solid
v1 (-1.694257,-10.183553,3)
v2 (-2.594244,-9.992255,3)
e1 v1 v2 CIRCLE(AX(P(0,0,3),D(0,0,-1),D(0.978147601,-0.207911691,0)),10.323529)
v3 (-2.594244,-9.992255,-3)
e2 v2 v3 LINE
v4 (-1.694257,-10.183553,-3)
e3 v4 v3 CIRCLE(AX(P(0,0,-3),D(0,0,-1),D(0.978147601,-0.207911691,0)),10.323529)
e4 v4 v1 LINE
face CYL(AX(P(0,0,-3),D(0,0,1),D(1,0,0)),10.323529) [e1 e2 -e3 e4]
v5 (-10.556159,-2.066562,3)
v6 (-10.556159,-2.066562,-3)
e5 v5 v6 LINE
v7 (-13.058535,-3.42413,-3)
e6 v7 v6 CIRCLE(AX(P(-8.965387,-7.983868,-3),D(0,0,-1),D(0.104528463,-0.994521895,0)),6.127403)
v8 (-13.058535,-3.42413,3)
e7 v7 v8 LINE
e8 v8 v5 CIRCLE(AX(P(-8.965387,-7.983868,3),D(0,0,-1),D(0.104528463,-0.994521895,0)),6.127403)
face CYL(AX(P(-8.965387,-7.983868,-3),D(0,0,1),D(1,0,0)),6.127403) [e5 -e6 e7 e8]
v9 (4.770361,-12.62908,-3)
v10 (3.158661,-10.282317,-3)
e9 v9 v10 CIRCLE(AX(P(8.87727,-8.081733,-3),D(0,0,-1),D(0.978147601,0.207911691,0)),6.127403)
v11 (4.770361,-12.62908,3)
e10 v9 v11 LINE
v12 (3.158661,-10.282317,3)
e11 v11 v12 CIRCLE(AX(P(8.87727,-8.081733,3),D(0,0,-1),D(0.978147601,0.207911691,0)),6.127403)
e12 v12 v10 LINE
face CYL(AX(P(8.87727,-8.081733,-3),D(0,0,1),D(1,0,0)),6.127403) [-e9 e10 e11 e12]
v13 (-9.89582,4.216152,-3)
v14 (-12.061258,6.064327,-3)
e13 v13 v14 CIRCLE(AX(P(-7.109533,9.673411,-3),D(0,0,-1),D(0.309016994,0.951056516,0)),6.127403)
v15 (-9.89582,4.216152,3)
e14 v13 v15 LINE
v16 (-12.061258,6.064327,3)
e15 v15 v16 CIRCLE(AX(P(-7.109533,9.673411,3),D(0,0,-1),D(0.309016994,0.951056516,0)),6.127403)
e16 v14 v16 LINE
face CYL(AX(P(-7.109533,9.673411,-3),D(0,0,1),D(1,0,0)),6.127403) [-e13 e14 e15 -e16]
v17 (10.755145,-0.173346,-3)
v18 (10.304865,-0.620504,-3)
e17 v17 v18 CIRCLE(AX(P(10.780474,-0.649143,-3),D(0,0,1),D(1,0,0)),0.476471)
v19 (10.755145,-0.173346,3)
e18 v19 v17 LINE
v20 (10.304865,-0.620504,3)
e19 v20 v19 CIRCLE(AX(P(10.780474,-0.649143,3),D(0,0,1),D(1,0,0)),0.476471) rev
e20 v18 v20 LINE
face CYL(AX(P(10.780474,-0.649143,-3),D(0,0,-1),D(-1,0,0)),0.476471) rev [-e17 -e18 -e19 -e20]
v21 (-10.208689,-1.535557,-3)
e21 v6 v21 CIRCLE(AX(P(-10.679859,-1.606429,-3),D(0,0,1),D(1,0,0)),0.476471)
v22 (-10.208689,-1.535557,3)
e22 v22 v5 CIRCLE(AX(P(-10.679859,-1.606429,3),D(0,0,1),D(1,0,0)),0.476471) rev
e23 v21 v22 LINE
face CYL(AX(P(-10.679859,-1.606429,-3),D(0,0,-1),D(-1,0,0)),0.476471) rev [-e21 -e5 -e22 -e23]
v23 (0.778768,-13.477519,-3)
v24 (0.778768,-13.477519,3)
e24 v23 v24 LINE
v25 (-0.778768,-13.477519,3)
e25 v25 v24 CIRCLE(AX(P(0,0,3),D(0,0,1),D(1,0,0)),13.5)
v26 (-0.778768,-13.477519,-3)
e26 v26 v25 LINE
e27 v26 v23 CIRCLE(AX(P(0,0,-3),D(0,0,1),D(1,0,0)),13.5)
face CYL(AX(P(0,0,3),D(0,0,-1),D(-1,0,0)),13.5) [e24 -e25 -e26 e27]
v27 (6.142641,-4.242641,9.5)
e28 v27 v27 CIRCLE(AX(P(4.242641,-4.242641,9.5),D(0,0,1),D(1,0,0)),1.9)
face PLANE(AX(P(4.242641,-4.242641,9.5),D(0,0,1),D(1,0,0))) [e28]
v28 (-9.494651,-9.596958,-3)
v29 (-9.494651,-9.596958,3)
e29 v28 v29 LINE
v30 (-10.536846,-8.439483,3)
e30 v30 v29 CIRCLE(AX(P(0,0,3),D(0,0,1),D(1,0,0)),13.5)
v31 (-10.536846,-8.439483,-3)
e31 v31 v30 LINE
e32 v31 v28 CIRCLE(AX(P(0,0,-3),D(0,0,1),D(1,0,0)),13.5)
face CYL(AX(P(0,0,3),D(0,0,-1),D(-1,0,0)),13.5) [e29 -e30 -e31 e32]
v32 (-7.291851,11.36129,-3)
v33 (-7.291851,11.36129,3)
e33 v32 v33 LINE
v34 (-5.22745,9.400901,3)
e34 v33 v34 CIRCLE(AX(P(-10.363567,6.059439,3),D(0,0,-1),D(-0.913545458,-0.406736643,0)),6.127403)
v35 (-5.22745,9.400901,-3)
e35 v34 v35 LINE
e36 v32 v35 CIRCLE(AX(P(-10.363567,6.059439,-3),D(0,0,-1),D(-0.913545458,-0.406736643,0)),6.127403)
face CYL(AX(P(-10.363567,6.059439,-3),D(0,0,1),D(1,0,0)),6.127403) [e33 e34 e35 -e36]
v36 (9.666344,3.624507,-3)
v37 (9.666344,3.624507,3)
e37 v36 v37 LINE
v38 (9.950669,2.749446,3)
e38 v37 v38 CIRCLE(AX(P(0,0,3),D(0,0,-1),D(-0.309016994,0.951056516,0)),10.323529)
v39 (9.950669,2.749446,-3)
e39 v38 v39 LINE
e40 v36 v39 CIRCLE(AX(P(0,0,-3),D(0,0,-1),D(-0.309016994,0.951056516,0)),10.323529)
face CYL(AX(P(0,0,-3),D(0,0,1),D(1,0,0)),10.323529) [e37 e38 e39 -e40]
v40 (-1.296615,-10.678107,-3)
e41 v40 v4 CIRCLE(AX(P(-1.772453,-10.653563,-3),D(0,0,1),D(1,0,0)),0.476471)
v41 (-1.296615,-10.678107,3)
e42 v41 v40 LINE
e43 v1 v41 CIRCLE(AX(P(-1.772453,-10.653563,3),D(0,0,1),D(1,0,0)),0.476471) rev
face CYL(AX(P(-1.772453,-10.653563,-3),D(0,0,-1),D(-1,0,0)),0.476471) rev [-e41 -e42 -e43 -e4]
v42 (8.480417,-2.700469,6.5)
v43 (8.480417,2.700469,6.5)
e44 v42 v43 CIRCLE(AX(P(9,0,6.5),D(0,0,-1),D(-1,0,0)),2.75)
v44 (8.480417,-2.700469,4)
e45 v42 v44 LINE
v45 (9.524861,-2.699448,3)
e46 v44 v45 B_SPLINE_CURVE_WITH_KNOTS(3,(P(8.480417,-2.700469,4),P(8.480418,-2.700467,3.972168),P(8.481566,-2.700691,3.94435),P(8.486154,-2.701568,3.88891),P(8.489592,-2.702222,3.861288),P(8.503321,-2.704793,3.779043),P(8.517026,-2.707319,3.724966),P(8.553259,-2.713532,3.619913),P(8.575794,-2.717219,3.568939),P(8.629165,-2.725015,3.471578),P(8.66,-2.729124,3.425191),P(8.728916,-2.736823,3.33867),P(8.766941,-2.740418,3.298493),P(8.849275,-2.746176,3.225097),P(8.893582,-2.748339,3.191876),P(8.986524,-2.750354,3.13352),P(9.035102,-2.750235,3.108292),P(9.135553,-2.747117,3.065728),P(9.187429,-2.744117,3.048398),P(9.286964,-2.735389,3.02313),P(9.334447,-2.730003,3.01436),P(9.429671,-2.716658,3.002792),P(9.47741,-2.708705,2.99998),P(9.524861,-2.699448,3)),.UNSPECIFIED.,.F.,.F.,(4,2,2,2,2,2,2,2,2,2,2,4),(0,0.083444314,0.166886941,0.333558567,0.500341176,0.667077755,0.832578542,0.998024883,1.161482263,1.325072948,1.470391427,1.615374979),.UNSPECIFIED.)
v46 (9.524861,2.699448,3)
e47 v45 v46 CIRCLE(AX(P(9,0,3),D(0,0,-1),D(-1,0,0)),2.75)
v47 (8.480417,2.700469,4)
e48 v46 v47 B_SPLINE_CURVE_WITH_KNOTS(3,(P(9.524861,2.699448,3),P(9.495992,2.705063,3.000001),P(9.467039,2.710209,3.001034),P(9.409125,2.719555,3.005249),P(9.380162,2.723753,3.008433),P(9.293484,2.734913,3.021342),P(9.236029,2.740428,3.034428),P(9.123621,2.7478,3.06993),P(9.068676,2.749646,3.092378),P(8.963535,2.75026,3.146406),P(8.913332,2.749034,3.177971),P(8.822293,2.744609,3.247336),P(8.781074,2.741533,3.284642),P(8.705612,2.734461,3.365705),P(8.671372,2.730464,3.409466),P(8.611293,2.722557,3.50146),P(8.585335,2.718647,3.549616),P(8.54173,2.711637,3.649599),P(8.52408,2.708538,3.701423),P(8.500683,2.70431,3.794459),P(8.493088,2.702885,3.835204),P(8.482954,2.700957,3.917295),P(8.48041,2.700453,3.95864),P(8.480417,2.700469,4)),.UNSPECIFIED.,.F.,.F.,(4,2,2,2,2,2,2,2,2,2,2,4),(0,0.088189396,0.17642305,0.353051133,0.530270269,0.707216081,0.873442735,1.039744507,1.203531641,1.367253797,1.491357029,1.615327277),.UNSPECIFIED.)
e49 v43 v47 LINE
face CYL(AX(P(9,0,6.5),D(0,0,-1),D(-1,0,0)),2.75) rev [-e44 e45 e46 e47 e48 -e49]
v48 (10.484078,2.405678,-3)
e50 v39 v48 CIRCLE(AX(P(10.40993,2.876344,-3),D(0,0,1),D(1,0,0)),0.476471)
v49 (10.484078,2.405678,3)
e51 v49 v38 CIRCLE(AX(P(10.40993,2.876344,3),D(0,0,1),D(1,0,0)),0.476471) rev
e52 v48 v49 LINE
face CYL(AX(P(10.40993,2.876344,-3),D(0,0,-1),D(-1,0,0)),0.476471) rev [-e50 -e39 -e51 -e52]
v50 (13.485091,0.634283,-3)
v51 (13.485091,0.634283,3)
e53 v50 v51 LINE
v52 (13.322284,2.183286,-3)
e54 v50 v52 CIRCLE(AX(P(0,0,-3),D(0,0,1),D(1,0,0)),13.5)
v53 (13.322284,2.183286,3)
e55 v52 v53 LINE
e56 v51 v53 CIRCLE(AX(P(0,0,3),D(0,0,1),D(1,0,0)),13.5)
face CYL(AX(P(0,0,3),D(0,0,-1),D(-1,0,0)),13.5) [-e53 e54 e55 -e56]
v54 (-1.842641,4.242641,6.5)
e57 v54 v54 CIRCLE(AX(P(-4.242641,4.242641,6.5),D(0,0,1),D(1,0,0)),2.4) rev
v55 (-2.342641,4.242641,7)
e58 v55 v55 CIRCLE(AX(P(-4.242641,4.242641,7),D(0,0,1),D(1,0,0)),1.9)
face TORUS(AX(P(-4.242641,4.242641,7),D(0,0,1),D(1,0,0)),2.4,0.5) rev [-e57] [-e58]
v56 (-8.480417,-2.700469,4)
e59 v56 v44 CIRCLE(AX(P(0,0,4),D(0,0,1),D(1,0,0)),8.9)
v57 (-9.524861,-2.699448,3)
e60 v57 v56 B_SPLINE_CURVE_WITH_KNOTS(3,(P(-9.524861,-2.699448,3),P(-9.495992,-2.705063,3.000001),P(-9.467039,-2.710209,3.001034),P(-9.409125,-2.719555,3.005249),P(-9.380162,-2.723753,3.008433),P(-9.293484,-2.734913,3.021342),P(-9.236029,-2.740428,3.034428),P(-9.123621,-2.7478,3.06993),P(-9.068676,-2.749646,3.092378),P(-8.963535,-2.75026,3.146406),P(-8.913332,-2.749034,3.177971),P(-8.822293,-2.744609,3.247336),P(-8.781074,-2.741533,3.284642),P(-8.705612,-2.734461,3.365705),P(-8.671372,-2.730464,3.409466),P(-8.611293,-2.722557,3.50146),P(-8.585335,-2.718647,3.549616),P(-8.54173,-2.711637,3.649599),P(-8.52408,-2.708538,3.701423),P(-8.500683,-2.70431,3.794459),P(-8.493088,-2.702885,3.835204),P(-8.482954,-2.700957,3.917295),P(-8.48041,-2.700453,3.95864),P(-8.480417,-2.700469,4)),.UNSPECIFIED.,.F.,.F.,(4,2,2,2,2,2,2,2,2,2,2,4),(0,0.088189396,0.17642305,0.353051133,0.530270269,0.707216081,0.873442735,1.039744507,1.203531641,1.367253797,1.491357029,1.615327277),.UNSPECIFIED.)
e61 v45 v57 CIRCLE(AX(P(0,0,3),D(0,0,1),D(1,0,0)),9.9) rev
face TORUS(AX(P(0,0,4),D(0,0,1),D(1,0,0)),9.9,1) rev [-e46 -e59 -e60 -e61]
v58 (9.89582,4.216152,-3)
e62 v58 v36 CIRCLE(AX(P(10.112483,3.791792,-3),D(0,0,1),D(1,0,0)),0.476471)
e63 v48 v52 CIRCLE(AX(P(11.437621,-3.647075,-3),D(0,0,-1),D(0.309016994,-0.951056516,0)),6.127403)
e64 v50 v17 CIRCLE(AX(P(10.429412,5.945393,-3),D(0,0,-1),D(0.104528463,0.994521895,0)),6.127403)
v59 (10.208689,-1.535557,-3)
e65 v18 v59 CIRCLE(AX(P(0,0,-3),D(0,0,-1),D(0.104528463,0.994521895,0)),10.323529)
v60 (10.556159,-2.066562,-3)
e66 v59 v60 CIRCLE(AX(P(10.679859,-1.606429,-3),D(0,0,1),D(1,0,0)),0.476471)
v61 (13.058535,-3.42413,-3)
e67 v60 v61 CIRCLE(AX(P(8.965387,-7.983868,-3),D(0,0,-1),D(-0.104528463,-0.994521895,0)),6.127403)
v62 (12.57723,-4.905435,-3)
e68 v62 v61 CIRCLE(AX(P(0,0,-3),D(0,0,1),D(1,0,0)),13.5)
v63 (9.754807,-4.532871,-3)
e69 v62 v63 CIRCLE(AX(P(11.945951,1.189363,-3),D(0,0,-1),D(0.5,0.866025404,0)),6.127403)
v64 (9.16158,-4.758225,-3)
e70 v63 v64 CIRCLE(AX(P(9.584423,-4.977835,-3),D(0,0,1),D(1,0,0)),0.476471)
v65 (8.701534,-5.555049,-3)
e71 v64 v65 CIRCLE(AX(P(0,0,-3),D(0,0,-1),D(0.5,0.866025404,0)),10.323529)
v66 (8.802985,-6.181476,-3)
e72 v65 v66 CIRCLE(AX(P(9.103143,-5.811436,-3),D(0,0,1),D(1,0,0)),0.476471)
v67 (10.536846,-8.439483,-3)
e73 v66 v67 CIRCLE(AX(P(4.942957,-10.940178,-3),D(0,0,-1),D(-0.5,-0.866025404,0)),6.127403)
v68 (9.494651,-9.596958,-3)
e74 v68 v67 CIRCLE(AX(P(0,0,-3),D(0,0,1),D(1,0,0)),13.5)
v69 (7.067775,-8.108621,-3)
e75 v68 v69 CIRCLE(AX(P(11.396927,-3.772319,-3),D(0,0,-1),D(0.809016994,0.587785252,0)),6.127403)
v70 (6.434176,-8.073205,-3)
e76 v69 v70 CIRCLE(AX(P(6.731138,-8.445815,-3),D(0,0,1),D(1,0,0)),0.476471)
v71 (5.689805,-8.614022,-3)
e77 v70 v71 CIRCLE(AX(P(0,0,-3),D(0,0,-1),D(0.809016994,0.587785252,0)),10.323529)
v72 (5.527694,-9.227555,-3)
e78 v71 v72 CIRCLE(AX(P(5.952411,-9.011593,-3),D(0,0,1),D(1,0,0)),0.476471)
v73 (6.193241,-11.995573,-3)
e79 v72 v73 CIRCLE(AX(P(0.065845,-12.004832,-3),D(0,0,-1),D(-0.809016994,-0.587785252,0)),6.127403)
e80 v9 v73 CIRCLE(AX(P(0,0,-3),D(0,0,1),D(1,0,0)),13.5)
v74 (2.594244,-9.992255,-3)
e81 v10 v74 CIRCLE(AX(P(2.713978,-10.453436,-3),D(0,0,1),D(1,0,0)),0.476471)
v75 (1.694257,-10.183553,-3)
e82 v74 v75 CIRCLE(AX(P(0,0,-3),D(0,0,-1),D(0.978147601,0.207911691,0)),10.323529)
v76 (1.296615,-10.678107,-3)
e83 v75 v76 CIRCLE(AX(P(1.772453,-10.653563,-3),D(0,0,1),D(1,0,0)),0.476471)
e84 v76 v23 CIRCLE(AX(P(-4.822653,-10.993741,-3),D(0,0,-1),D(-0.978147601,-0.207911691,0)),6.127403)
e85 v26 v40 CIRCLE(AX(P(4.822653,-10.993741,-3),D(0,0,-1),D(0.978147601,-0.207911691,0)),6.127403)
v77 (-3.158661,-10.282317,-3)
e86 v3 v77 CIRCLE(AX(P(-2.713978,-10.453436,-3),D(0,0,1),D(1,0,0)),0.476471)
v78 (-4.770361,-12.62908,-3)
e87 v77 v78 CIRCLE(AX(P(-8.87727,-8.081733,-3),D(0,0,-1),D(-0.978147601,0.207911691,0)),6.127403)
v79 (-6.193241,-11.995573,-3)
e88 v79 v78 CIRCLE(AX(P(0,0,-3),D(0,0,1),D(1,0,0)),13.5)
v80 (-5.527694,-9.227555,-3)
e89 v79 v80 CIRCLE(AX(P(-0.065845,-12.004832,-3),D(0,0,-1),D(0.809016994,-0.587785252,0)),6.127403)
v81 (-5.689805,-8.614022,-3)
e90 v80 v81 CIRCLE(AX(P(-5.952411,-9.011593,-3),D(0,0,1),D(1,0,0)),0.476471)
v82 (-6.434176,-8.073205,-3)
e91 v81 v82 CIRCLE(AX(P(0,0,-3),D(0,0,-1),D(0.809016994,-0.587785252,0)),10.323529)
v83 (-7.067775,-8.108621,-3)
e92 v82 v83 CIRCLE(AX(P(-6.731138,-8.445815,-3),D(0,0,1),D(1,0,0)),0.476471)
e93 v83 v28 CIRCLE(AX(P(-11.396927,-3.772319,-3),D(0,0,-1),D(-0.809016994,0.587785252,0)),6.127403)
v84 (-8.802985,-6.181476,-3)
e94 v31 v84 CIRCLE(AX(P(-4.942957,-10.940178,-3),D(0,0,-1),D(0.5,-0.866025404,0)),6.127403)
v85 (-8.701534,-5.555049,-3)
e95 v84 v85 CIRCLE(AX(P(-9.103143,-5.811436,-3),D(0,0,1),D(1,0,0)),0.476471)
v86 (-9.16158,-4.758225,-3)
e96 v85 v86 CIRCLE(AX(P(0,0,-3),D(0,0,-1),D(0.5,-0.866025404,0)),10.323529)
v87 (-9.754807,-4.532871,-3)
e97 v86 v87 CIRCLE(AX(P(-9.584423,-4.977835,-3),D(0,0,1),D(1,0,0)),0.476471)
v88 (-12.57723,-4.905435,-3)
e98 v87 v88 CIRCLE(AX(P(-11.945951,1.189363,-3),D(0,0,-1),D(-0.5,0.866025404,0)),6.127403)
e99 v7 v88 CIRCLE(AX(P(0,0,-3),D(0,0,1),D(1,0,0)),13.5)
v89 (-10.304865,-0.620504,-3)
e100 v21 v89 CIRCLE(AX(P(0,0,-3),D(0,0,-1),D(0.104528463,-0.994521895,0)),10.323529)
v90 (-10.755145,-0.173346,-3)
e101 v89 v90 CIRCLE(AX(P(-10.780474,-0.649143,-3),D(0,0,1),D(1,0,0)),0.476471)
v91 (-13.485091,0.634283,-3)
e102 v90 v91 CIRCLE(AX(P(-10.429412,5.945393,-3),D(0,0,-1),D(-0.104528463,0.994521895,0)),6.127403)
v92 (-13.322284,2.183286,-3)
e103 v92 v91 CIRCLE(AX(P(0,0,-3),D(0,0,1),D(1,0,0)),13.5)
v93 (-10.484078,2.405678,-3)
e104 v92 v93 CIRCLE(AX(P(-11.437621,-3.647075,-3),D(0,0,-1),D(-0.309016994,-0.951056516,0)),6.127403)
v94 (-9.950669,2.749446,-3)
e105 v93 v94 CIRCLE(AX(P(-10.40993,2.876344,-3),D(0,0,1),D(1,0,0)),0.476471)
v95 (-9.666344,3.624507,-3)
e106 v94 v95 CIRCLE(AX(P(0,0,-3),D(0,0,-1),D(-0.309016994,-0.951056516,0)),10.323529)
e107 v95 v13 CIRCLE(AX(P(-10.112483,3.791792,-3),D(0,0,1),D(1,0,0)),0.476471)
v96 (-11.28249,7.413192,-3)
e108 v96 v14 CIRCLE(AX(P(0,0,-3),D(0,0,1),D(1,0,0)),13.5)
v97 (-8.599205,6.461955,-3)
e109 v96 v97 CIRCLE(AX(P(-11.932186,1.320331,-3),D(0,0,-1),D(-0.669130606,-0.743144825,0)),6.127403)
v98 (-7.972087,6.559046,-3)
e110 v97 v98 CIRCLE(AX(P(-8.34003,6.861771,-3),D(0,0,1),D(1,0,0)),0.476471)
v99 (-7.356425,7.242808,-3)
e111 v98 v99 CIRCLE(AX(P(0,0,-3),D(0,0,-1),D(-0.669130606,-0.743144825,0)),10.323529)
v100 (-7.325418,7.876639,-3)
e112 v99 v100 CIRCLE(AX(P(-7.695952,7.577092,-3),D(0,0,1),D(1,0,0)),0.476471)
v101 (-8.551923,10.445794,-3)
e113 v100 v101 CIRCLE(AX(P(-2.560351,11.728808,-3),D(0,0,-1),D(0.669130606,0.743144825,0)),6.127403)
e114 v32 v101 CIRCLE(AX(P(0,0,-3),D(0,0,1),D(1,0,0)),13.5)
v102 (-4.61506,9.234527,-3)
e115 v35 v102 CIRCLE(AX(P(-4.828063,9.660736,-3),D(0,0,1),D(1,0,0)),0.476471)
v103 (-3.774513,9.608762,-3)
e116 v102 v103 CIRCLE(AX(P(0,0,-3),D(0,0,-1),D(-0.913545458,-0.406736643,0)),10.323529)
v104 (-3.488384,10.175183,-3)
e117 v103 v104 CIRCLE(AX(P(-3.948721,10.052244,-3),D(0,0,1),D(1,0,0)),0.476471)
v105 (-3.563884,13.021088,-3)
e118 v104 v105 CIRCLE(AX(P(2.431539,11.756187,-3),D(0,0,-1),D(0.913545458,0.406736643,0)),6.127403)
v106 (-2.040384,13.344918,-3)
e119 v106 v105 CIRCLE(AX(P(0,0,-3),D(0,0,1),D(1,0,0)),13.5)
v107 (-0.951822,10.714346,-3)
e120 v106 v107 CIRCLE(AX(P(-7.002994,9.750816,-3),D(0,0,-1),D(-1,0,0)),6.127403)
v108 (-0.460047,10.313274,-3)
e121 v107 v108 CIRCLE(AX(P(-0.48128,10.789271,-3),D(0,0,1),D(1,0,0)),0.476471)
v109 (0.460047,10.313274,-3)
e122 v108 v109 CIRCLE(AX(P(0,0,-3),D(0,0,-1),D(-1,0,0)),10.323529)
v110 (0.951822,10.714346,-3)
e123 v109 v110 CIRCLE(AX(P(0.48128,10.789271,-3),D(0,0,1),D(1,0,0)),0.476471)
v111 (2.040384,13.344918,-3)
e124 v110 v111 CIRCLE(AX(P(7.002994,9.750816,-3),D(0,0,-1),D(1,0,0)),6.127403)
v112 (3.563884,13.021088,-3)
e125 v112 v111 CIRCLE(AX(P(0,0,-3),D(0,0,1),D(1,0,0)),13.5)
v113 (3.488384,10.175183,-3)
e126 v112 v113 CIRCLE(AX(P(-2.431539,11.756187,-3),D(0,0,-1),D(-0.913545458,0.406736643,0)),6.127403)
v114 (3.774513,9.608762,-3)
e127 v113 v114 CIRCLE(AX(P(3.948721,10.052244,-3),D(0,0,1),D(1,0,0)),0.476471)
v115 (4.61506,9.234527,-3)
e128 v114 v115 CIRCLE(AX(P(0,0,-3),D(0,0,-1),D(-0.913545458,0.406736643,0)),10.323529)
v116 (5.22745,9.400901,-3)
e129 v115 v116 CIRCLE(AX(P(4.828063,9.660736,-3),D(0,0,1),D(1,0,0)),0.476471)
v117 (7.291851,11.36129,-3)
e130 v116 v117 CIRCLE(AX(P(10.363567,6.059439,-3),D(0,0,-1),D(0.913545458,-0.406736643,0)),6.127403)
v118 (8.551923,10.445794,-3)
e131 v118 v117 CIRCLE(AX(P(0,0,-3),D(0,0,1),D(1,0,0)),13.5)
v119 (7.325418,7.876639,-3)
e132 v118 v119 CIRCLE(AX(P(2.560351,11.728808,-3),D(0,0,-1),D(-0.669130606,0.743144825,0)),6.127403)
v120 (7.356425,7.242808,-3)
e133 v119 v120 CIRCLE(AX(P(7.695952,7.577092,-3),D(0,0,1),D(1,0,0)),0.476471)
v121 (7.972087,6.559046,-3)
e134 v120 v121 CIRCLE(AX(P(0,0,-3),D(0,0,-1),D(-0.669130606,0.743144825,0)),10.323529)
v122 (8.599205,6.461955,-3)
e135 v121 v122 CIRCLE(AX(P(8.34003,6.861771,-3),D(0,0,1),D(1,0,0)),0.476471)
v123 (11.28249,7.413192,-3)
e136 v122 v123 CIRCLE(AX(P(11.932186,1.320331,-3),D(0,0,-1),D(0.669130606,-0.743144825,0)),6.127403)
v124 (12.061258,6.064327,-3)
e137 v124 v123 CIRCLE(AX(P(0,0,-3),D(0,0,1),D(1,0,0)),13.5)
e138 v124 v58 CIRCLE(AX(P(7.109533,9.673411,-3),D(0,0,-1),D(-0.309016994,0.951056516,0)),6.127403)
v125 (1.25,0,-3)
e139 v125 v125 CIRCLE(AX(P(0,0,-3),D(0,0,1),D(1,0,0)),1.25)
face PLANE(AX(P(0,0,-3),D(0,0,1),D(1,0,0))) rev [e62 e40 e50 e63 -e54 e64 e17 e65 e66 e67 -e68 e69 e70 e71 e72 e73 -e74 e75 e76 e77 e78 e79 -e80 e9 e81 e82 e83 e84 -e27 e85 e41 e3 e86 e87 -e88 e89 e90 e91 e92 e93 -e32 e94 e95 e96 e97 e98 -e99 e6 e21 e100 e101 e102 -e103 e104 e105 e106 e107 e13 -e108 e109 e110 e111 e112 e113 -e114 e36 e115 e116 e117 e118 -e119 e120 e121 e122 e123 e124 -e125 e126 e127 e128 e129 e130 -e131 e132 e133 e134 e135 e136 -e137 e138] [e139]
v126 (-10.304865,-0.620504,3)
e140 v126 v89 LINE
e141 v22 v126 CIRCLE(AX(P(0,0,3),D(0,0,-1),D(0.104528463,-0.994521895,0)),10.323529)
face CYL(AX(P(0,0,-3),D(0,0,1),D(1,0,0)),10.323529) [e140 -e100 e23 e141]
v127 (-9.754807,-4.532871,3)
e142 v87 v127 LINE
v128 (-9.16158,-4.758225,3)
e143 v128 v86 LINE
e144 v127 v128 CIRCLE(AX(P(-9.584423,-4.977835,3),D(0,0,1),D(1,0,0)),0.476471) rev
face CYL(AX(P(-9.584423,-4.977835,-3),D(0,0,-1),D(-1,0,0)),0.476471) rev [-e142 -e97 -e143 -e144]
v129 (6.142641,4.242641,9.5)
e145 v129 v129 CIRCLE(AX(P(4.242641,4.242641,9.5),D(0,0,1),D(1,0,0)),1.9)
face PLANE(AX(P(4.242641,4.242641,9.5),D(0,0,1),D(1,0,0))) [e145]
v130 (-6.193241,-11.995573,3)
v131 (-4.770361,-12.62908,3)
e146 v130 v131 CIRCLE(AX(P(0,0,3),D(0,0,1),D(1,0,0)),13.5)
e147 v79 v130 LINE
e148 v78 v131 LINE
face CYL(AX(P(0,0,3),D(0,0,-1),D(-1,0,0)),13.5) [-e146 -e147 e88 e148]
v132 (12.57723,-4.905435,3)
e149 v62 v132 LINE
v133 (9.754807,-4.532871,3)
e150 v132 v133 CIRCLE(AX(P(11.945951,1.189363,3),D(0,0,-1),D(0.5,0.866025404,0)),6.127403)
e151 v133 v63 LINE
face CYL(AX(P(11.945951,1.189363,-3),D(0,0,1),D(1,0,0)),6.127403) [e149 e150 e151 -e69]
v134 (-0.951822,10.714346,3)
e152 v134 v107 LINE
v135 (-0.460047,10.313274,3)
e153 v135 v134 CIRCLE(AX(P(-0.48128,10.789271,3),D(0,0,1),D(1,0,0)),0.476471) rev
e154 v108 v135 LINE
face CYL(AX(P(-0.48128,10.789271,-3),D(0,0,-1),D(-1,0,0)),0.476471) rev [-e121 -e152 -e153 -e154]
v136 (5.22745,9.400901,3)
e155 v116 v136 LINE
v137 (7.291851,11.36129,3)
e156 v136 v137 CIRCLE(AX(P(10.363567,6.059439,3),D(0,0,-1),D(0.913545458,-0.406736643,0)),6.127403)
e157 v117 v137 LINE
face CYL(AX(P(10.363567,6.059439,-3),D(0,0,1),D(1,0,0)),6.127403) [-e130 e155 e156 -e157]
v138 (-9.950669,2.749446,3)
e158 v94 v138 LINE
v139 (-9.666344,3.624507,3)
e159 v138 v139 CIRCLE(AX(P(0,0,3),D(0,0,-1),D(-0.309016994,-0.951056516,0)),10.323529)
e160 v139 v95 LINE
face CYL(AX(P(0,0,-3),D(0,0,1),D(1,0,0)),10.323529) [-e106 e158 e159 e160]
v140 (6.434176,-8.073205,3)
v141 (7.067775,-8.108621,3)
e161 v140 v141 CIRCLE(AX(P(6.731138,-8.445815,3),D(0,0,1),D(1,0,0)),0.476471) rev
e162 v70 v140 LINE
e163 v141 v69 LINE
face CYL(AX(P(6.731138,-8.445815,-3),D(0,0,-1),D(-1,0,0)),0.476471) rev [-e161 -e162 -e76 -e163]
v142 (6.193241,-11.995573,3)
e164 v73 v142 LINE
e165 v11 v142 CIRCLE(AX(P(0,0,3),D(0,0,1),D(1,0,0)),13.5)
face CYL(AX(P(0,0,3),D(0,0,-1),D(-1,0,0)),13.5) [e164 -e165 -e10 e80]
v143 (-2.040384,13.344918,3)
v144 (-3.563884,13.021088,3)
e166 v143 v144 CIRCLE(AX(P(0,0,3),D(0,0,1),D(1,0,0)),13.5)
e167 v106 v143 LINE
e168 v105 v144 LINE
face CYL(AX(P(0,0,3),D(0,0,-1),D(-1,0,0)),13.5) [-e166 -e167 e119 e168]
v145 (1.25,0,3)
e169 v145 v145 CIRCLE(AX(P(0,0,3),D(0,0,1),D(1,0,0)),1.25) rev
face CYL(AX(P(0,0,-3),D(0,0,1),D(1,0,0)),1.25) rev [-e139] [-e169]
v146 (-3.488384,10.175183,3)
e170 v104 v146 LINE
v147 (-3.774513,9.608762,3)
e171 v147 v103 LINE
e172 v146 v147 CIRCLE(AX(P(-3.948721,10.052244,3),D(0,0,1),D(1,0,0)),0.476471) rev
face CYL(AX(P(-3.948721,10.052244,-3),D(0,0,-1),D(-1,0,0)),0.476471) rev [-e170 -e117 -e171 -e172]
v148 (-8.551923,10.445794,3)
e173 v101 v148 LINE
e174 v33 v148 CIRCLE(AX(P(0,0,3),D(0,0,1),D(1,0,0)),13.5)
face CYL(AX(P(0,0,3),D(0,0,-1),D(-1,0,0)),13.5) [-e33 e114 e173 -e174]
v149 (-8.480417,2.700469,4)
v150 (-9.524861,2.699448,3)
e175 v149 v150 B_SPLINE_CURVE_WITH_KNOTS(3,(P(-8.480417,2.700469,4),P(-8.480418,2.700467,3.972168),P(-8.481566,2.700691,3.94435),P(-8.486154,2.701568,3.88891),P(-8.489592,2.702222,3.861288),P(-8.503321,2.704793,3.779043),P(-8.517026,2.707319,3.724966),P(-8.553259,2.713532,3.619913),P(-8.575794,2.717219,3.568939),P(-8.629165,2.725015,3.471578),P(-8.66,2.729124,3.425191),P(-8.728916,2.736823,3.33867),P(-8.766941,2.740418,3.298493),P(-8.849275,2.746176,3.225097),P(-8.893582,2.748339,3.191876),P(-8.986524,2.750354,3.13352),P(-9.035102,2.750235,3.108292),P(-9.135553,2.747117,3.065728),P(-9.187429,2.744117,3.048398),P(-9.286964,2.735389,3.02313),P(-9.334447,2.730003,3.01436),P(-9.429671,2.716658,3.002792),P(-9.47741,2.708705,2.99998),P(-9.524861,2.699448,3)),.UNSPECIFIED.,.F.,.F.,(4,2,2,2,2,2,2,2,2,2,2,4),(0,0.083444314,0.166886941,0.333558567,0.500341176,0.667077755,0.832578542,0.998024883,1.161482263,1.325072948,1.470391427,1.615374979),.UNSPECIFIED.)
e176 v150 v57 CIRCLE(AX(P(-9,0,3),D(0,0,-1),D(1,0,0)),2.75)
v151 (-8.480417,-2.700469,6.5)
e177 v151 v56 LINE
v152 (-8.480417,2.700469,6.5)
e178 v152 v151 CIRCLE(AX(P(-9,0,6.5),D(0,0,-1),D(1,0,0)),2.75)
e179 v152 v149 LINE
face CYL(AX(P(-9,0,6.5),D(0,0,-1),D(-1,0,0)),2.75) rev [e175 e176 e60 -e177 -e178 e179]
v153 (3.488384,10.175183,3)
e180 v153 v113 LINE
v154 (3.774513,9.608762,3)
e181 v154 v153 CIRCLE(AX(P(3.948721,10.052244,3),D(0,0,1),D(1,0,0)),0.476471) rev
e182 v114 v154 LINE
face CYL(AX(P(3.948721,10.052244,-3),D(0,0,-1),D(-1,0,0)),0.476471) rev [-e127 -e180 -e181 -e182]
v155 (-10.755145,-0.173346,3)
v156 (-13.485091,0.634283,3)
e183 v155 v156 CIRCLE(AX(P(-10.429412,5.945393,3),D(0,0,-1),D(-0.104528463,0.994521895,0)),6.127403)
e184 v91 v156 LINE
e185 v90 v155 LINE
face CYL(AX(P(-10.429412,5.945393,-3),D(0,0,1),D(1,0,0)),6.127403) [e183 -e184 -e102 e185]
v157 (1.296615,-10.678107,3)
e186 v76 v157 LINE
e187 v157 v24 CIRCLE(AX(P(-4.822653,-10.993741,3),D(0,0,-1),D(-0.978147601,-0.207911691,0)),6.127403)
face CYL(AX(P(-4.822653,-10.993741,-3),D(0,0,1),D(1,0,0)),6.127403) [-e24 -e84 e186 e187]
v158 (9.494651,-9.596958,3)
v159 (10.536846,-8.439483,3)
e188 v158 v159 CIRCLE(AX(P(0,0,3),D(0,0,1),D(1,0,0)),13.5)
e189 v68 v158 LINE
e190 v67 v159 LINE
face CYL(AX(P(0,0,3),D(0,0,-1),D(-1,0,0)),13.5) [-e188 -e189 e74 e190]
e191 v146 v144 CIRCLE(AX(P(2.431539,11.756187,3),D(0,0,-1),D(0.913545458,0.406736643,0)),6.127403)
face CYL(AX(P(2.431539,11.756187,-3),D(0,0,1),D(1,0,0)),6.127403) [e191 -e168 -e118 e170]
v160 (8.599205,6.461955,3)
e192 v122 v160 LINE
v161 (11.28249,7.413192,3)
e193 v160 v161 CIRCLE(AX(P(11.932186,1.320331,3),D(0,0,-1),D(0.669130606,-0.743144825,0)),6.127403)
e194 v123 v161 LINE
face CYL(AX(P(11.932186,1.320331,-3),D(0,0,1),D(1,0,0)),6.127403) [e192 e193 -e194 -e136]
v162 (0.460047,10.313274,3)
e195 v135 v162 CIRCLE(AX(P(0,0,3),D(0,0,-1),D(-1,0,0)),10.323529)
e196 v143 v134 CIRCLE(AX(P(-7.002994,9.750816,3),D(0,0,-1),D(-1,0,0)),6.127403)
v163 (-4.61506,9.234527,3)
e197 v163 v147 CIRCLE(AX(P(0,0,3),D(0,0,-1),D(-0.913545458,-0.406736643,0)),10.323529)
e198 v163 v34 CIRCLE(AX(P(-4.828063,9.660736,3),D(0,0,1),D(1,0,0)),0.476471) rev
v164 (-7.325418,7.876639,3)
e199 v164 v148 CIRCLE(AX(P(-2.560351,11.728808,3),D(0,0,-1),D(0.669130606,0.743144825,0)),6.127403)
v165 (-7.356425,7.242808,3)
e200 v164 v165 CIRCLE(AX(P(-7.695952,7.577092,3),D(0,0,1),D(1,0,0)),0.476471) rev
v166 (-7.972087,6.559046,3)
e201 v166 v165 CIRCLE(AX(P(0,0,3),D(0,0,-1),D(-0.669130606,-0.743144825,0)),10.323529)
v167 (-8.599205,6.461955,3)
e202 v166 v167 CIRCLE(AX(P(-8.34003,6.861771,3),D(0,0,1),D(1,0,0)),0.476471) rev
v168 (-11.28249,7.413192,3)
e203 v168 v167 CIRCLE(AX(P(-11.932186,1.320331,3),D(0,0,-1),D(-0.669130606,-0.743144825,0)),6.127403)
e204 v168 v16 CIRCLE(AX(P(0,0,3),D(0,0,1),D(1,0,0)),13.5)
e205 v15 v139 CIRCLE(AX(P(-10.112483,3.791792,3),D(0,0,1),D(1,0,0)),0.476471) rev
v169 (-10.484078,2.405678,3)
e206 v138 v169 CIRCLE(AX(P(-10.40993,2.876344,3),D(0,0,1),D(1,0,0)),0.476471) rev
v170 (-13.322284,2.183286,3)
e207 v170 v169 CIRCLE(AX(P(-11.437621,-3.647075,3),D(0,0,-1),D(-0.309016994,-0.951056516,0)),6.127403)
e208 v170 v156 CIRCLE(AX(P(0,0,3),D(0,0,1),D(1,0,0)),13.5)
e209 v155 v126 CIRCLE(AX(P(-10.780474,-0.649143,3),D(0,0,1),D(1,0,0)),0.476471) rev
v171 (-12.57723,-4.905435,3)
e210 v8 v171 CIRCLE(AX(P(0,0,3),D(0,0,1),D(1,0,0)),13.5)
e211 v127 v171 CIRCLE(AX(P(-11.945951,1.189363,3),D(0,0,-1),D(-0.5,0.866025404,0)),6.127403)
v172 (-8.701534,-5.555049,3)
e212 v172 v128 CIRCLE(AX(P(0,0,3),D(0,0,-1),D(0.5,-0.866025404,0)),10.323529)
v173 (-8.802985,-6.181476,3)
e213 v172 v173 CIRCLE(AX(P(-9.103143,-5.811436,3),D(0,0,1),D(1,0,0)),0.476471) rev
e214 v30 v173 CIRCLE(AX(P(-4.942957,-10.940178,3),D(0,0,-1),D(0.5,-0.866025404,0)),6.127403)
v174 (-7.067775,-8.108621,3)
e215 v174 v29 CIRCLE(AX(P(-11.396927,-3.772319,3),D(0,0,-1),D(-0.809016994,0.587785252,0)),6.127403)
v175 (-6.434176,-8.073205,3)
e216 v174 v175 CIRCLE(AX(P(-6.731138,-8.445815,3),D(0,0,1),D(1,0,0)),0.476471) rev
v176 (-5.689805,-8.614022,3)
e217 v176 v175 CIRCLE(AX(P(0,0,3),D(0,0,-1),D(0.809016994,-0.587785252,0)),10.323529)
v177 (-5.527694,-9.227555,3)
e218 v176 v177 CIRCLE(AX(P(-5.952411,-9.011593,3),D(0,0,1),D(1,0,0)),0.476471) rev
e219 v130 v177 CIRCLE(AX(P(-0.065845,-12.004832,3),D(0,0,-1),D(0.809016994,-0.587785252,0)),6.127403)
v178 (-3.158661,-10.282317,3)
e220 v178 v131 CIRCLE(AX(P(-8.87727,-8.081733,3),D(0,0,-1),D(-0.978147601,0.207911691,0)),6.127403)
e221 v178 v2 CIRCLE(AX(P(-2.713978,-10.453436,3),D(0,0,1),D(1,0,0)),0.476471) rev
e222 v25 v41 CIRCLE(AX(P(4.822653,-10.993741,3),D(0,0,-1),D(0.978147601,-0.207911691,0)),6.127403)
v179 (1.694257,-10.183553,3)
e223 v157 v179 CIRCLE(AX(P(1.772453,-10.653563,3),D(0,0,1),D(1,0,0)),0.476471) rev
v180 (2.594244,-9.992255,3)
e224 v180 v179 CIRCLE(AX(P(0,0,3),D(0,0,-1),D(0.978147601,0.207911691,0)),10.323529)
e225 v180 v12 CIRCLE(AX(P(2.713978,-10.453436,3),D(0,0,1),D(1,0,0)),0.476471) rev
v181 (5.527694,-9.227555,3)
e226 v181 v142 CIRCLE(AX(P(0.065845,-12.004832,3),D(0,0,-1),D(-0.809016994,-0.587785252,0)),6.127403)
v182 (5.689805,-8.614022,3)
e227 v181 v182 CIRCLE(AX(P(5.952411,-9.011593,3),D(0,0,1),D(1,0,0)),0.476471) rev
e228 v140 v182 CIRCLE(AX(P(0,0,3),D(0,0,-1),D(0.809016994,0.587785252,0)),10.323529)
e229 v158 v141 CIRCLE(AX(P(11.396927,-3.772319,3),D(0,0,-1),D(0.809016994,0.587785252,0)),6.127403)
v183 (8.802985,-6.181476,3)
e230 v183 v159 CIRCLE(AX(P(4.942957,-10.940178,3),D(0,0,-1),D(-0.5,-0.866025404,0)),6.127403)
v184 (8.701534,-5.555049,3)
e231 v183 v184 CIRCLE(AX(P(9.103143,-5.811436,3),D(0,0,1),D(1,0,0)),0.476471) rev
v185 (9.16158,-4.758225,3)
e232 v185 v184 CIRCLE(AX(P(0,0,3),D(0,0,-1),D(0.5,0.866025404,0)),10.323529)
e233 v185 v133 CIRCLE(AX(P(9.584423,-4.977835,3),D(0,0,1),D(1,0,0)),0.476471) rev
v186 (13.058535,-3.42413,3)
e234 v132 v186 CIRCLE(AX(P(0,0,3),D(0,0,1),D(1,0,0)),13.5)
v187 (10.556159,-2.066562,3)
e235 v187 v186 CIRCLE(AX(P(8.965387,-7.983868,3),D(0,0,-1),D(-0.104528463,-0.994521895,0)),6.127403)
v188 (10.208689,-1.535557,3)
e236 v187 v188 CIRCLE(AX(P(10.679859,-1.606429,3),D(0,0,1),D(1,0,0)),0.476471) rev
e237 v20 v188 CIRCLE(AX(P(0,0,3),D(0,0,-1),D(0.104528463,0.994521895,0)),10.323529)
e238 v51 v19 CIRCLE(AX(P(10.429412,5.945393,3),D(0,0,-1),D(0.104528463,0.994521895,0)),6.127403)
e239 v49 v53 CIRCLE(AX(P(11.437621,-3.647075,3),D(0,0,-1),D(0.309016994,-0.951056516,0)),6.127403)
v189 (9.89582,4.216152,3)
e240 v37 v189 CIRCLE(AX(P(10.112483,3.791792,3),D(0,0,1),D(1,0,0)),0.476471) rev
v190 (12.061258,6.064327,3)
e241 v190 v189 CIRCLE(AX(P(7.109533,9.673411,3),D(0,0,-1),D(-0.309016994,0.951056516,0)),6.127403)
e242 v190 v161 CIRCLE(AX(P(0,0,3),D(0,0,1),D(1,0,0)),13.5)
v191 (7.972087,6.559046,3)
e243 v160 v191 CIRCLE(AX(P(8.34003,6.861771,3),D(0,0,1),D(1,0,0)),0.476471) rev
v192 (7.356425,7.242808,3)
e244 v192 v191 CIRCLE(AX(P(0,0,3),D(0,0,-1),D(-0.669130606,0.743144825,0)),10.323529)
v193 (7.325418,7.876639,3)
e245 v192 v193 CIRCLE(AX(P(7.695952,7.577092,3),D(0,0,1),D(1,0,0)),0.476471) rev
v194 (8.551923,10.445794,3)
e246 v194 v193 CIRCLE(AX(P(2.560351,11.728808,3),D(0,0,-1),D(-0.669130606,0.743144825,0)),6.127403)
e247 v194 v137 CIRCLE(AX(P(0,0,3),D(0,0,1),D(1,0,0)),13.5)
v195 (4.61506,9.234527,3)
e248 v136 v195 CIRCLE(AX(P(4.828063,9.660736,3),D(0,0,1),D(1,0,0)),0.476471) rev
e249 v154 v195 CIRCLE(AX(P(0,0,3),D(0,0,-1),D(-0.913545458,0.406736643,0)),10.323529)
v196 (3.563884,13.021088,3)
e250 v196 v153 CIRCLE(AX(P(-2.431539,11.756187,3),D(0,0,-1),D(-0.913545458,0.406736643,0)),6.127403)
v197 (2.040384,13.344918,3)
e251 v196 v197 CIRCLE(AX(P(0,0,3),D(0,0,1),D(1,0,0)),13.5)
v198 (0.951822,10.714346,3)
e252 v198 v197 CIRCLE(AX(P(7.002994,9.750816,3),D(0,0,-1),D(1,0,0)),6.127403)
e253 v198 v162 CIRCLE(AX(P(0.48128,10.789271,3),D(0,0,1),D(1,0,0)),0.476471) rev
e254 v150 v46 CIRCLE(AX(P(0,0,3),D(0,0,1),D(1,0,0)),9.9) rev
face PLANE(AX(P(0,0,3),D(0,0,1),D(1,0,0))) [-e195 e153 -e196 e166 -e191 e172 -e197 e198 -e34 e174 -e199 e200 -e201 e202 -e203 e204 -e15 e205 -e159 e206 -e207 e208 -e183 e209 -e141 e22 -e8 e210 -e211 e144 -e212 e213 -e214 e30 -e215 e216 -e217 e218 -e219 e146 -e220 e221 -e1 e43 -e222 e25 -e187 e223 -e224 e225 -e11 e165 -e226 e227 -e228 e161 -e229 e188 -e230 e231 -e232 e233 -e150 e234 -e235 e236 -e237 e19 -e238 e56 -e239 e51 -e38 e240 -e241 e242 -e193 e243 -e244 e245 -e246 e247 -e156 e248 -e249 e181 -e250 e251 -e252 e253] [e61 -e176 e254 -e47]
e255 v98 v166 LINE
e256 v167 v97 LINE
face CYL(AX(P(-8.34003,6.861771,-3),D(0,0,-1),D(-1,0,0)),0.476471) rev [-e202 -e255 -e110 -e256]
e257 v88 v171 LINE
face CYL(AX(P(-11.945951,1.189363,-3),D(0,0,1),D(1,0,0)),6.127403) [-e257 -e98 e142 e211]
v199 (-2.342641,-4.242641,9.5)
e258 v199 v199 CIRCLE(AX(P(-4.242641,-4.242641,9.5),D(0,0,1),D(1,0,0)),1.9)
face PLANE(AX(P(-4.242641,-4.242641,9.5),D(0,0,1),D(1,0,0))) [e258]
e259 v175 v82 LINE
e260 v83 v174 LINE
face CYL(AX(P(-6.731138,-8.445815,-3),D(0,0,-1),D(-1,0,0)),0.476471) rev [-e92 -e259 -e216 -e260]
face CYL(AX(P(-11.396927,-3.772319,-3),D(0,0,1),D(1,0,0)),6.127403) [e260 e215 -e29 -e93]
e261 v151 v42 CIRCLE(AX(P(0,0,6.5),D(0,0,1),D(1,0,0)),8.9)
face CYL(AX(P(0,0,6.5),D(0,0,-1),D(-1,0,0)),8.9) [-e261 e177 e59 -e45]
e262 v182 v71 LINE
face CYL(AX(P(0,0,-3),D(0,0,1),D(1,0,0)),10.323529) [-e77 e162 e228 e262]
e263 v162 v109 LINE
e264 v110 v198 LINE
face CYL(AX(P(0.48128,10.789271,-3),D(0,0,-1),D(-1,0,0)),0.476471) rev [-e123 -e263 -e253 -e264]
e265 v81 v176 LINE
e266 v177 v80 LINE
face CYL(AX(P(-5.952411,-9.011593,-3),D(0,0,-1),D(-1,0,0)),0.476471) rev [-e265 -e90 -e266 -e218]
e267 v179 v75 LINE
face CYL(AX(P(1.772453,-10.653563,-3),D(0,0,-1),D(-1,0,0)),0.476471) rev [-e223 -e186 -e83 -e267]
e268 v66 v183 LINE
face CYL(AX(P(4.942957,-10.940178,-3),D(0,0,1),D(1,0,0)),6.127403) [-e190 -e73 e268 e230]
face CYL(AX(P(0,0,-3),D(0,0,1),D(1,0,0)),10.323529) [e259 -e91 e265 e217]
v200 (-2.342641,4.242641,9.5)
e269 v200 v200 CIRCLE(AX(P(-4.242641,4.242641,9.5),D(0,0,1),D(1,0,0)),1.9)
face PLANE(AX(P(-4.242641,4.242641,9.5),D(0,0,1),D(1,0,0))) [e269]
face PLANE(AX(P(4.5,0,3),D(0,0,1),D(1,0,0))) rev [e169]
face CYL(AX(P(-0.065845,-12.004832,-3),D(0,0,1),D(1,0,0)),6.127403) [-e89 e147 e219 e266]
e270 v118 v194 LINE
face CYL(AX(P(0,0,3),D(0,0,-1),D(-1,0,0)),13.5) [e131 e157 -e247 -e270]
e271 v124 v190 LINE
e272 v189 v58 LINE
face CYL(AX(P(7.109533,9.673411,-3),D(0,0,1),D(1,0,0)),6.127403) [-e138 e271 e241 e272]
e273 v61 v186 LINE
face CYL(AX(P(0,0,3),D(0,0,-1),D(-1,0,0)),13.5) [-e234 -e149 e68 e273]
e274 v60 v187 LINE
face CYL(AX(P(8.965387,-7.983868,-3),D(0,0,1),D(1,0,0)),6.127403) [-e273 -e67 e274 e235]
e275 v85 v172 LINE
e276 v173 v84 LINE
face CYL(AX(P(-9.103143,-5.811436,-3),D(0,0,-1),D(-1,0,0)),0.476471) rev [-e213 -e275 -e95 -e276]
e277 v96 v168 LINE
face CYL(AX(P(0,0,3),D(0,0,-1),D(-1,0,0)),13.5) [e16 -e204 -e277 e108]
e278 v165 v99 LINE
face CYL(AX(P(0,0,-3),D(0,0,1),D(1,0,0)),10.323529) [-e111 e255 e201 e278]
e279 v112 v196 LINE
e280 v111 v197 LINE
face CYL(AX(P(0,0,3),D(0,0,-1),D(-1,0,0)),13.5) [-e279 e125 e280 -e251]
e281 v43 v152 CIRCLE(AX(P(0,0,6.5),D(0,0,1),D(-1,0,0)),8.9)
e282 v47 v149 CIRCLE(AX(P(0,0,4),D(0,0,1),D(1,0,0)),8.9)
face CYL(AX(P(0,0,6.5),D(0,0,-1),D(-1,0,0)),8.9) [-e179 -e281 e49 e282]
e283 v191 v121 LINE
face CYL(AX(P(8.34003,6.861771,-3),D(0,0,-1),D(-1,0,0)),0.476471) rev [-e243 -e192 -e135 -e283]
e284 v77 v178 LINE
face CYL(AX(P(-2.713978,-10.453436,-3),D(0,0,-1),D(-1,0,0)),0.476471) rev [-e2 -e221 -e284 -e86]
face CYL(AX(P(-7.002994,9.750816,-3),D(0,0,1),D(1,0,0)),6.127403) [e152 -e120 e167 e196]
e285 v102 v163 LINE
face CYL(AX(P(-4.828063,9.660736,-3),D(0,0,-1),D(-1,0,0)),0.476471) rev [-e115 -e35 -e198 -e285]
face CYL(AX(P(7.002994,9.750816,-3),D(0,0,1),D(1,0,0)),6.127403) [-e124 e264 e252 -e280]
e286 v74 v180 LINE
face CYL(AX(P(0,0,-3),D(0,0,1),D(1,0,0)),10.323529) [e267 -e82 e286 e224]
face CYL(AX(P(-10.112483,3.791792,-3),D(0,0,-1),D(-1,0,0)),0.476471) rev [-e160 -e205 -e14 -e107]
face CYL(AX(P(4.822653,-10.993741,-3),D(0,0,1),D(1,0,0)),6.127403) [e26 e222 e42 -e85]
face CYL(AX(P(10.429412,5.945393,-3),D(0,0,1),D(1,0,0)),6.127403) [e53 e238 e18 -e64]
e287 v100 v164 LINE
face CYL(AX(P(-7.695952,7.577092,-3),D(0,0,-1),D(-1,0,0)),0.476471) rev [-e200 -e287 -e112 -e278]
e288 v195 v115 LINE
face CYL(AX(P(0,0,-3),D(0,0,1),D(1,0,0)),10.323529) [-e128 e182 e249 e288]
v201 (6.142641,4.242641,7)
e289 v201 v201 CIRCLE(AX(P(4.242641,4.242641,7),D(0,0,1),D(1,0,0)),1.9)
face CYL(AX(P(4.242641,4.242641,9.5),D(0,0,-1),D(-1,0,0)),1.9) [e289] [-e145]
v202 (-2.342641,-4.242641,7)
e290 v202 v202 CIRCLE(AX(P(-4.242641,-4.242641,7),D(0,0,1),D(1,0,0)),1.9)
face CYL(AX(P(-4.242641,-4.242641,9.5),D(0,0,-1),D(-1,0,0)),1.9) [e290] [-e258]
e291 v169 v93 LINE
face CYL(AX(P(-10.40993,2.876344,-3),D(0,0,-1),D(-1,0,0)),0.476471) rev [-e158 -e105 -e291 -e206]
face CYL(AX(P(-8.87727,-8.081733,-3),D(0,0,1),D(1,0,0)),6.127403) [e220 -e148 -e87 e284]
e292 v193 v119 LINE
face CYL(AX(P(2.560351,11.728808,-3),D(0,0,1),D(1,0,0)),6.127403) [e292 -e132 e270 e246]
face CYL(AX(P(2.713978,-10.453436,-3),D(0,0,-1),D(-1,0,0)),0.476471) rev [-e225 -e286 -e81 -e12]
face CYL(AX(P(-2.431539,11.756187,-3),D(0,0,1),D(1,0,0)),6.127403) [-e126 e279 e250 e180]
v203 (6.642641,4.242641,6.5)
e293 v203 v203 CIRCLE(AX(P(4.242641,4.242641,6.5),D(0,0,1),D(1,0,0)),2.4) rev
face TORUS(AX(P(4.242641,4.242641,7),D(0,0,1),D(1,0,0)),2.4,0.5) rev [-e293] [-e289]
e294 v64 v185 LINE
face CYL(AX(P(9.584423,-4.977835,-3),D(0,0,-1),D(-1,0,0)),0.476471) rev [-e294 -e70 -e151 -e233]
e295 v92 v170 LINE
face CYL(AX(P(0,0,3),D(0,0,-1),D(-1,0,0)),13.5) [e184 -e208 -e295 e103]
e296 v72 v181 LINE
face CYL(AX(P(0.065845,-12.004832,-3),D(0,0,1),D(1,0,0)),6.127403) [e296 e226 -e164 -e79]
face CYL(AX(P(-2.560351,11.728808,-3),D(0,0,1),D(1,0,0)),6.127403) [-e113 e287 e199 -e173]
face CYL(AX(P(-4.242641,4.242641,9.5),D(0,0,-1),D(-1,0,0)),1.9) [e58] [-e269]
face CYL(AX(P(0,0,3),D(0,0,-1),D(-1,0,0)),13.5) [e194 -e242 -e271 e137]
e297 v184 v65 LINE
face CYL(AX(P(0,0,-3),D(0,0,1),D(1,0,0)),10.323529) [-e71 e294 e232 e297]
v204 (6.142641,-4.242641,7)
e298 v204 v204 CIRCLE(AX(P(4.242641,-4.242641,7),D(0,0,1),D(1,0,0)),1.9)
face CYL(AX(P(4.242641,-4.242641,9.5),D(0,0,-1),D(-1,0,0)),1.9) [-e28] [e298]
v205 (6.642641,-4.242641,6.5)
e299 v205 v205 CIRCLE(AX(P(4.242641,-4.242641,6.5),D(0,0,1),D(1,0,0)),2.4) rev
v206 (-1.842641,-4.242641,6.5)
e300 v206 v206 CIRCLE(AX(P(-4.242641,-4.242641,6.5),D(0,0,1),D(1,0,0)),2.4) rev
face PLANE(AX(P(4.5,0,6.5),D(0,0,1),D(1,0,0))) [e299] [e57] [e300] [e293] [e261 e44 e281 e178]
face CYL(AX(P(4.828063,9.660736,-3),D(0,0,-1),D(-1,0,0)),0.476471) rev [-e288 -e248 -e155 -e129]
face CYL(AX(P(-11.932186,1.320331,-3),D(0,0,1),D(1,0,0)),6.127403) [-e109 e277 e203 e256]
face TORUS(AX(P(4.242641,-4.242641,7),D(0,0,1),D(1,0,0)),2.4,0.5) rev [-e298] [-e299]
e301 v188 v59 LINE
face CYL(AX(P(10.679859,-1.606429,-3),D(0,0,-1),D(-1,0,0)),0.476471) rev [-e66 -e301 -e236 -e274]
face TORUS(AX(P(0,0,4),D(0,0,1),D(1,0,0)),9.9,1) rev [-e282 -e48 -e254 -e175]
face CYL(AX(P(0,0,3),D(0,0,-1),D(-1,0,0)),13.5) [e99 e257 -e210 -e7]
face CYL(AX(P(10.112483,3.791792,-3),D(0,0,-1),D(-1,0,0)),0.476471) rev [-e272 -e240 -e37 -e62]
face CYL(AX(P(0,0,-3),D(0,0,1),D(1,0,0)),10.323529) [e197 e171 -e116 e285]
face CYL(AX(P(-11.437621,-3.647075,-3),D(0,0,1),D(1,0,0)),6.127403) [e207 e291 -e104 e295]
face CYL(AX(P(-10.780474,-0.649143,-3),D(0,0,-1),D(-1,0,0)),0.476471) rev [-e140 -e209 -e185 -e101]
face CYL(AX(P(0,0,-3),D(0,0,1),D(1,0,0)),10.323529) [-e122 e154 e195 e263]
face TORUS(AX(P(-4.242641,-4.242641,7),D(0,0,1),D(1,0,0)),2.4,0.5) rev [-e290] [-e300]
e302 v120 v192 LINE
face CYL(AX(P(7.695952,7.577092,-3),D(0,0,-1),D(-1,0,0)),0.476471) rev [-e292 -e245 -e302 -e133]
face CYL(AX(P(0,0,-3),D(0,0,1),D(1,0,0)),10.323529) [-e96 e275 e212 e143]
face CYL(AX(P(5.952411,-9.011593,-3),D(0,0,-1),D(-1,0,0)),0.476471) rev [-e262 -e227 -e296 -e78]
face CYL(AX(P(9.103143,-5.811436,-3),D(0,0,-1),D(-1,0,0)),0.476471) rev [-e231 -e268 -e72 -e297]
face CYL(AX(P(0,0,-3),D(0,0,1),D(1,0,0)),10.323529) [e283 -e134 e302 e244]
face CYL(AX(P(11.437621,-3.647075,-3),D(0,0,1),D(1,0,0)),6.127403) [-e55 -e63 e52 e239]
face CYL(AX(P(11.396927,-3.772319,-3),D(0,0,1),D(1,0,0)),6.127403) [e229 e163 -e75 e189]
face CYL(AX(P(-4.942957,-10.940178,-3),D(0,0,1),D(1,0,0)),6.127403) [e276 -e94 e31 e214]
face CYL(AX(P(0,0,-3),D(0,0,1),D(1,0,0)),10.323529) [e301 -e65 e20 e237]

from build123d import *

# Parameters (mm, degrees)
SKETCH1_R                      = 13.5
BOSS_EXTRUDE1_DEPTH            = 3
CUT_EXTRUDE1_DEPTH             = 20.32614809
FILLET2_R                      = 0.476470588
CIRPATTERN1_COUNT              = 15
FILLET2_OF_CIRPATTERN1_R       = 0.476470588
THROUGH_CENTER_HOLE_DEPTH      = 20.315736881
THROUGH_CENTER_HOLE_DEPTH_BACK = 20.315736881
SKETCH5_R                      = 1.25
BOSS_EXTRUDE2_DEPTH            = 3.5
SKETCH7_R                      = 1.9
BOSS_EXTRUDE3_DEPTH            = 3
FILLET3_R                      = 1
FILLET4_R                      = 0.5


with BuildPart() as part:
    # Sketch1 → Boss-Extrude1 (new, symmetric)
    with BuildSketch(Plane.XY):
        Circle(SKETCH1_R)
    extrude(amount=BOSS_EXTRUDE1_DEPTH, both=True)

    # Sketch3 → Cut-Extrude1 (cut, symmetric)
    with BuildSketch(Plane.XY):
        with BuildLine():
            ThreePointArc((-2.040384037, 13.344917871), (-1.26191316, 11.892090906), (-0.898861073, 10.284323424))
            ThreePointArc((-0.898861073, 10.284323424), (0, 10.323529412), (0.898861073, 10.284323424))
            ThreePointArc((0.898861073, 10.284323424), (1.26191316, 11.892090906), (2.040384037, 13.344917871))
            ThreePointArc((2.040384037, 13.344917871), (0, 13.5), (-2.040384037, 13.344917871))
        make_face()
    cut_extrude1 = extrude(amount=CUT_EXTRUDE1_DEPTH, both=True, mode=Mode.SUBTRACT)

    # Fillet2
    fillet2_edges = [part.edges().sort_by_distance(p)[0] for p in [
        (0.898861073, 10.284323424, 0),
        (-0.898861073, 10.284323424, 0),
    ]]
    fillet(fillet2_edges, radius=FILLET2_R)

    # CirPattern1: Cut-Extrude1 ×15 about axis
    cirpattern1_axis = Axis((0, 0, 0), (0, 0, 1))
    for i in range(1, CIRPATTERN1_COUNT):
        add(cut_extrude1.rotate(cirpattern1_axis, i * 360 / CIRPATTERN1_COUNT), mode=Mode.SUBTRACT)

    # Fillet2 of CirPattern1
    fillet2_of_cirpattern1_edges = [part.edges().sort_by_distance(p)[0] for p in [
        (-3.361860735, 9.760796684, 0),
        (-5.004161636, 9.029597213, 0),
        (-7.041286281, 7.549539524, 0),
        (-8.244197191, 6.213571613, 0),
        (-9.503209461, 4.032898395, 0),
        (-10.058736155, 2.323163032, 0),
        (-10.321941391, -0.181067505, 0),
        (-10.134028257, -1.968941542, 0),
        (-9.355915883, -4.363725188, 0),
        (-8.457054809, -5.920598236, 0),
        (-6.772167522, -7.791855143, 0),
        (-5.317779754, -8.848529708, 0),
        (-3.017449874, -9.872702557, 0),
        (-1.25901227, -10.246470008, 0),
        (1.25901227, -10.246470008, 0),
        (3.017449874, -9.872702557, 0),
        (5.317779754, -8.848529708, 0),
        (6.772167522, -7.791855143, 0),
        (8.457054809, -5.920598236, 0),
        (9.355915883, -4.363725188, 0),
        (10.134028257, -1.968941542, 0),
        (10.321941391, -0.181067505, 0),
        (10.058736155, 2.323163032, 0),
        (9.503209461, 4.032898395, 0),
        (8.244197191, 6.213571613, 0),
        (7.041286281, 7.549539524, 0),
        (5.004161636, 9.029597213, 0),
        (3.361860735, 9.760796684, 0),
    ]]
    fillet(fillet2_of_cirpattern1_edges, radius=FILLET2_OF_CIRPATTERN1_R)

    # Sketch5 → Through_Center_Hole (cut, two sides: drawn at the far end of the back side and taken through both)
    with BuildSketch(Plane.XY.offset(-THROUGH_CENTER_HOLE_DEPTH_BACK)):
        Circle(SKETCH5_R)
    extrude(amount=THROUGH_CENTER_HOLE_DEPTH + THROUGH_CENTER_HOLE_DEPTH_BACK, mode=Mode.SUBTRACT)

    # Sketch6 → Boss-Extrude2 (add)
    with BuildSketch(Plane.XY.offset(3)):
        with BuildLine():
            ThreePointArc((-8.480416667, -2.700469063), (-6.25, 0), (-8.480416667, 2.700469063))
            ThreePointArc((-8.480416667, 2.700469063), (0, 8.9), (8.480416667, 2.700469063))
            ThreePointArc((8.480416667, 2.700469063), (6.25, 0), (8.480416667, -2.700469063))
            ThreePointArc((8.480416667, -2.700469063), (0, -8.9), (-8.480416667, -2.700469063))
        make_face()
    extrude(amount=BOSS_EXTRUDE2_DEPTH)

    # Sketch7 → Boss-Extrude3 (add)
    with BuildSketch(Plane.XY.offset(6.5)):
        with Locations((-4.242640687, 4.242640687)):
            Circle(SKETCH7_R)
        with Locations((4.242640687, 4.242640687)):
            Circle(SKETCH7_R)
        with Locations((4.242640687, -4.242640687)):
            Circle(SKETCH7_R)
        with Locations((-4.242640687, -4.242640687)):
            Circle(SKETCH7_R)
    extrude(amount=BOSS_EXTRUDE3_DEPTH)

    # Fillet3
    # the kernel refuses this fillet: 1 mm, written as the material it adds along each edge
    with BuildSketch(Plane(origin=(0, 0, 3), x_dir=(0.9996330098529925, -0.02708958494047193, 0), z_dir=(0.02708958494047193, 0.9996330098529925, 0))) as fillet3_piece_1_section:
        with BuildLine():
            CenterArc((8.9 + FILLET3_R, -FILLET3_R), FILLET3_R, 90, 90)
            Line((8.9, -FILLET3_R), (8.9, 0))
            Line((8.9, 0), (8.9 + FILLET3_R, 0))
        make_face()
    fillet3_piece_1 = revolve(axis=Axis((0, 0, 3), (0, 0, -1)), revolution_arc=176.895382431, mode=Mode.PRIVATE)
    fillet3_piece_1 = fillet3_piece_1 - Plane(origin=(9, 0, 3.280116287), x_dir=(-0.18893939393939513, 0.9819887501482969, 0), z_dir=(0, 0, -1)) * Cylinder(2.75, 40, mode=Mode.PRIVATE)
    fillet3_piece_1 = fillet3_piece_1 - Plane(origin=(-9, 0, 3.280116287), x_dir=(0.18893939393939513, -0.9819887501482969, 0), z_dir=(0, 0, -1)) * Cylinder(2.75, 40, mode=Mode.PRIVATE)
    add(fillet3_piece_1)
    with BuildSketch(Plane(origin=(0, 0, 3), x_dir=(-0.9996330098529925, 0.027089584940471288, 0), z_dir=(-0.027089584940471288, -0.9996330098529925, 0))) as fillet3_piece_2_section:
        with BuildLine():
            CenterArc((8.9 + FILLET3_R, -FILLET3_R), FILLET3_R, 90, 90)
            Line((8.9, -FILLET3_R), (8.9, 0))
            Line((8.9, 0), (8.9 + FILLET3_R, 0))
        make_face()
    fillet3_piece_2 = revolve(axis=Axis((0, 0, 3), (0, 0, -1)), revolution_arc=176.895382431, mode=Mode.PRIVATE)
    fillet3_piece_2 = fillet3_piece_2 - Plane(origin=(9, 0, 3.280116287), x_dir=(-0.18893939393939513, 0.9819887501482969, 0), z_dir=(0, 0, -1)) * Cylinder(2.75, 40, mode=Mode.PRIVATE)
    fillet3_piece_2 = fillet3_piece_2 - Plane(origin=(-9, 0, 3.280116287), x_dir=(0.18893939393939513, -0.9819887501482969, 0), z_dir=(0, 0, -1)) * Cylinder(2.75, 40, mode=Mode.PRIVATE)
    add(fillet3_piece_2)

    # Fillet4
    fillet4_edges = [part.edges().sort_by_distance(p)[0] for p in [
        (-6.142640687, 4.242640687, 6.5),
        (2.342640687, 4.242640687, 6.5),
        (2.342640687, -4.242640687, 6.5),
        (-6.142640687, -4.242640687, 6.5),
    ]]
    fillet(fillet4_edges, radius=FILLET4_R)


solid = part.part
